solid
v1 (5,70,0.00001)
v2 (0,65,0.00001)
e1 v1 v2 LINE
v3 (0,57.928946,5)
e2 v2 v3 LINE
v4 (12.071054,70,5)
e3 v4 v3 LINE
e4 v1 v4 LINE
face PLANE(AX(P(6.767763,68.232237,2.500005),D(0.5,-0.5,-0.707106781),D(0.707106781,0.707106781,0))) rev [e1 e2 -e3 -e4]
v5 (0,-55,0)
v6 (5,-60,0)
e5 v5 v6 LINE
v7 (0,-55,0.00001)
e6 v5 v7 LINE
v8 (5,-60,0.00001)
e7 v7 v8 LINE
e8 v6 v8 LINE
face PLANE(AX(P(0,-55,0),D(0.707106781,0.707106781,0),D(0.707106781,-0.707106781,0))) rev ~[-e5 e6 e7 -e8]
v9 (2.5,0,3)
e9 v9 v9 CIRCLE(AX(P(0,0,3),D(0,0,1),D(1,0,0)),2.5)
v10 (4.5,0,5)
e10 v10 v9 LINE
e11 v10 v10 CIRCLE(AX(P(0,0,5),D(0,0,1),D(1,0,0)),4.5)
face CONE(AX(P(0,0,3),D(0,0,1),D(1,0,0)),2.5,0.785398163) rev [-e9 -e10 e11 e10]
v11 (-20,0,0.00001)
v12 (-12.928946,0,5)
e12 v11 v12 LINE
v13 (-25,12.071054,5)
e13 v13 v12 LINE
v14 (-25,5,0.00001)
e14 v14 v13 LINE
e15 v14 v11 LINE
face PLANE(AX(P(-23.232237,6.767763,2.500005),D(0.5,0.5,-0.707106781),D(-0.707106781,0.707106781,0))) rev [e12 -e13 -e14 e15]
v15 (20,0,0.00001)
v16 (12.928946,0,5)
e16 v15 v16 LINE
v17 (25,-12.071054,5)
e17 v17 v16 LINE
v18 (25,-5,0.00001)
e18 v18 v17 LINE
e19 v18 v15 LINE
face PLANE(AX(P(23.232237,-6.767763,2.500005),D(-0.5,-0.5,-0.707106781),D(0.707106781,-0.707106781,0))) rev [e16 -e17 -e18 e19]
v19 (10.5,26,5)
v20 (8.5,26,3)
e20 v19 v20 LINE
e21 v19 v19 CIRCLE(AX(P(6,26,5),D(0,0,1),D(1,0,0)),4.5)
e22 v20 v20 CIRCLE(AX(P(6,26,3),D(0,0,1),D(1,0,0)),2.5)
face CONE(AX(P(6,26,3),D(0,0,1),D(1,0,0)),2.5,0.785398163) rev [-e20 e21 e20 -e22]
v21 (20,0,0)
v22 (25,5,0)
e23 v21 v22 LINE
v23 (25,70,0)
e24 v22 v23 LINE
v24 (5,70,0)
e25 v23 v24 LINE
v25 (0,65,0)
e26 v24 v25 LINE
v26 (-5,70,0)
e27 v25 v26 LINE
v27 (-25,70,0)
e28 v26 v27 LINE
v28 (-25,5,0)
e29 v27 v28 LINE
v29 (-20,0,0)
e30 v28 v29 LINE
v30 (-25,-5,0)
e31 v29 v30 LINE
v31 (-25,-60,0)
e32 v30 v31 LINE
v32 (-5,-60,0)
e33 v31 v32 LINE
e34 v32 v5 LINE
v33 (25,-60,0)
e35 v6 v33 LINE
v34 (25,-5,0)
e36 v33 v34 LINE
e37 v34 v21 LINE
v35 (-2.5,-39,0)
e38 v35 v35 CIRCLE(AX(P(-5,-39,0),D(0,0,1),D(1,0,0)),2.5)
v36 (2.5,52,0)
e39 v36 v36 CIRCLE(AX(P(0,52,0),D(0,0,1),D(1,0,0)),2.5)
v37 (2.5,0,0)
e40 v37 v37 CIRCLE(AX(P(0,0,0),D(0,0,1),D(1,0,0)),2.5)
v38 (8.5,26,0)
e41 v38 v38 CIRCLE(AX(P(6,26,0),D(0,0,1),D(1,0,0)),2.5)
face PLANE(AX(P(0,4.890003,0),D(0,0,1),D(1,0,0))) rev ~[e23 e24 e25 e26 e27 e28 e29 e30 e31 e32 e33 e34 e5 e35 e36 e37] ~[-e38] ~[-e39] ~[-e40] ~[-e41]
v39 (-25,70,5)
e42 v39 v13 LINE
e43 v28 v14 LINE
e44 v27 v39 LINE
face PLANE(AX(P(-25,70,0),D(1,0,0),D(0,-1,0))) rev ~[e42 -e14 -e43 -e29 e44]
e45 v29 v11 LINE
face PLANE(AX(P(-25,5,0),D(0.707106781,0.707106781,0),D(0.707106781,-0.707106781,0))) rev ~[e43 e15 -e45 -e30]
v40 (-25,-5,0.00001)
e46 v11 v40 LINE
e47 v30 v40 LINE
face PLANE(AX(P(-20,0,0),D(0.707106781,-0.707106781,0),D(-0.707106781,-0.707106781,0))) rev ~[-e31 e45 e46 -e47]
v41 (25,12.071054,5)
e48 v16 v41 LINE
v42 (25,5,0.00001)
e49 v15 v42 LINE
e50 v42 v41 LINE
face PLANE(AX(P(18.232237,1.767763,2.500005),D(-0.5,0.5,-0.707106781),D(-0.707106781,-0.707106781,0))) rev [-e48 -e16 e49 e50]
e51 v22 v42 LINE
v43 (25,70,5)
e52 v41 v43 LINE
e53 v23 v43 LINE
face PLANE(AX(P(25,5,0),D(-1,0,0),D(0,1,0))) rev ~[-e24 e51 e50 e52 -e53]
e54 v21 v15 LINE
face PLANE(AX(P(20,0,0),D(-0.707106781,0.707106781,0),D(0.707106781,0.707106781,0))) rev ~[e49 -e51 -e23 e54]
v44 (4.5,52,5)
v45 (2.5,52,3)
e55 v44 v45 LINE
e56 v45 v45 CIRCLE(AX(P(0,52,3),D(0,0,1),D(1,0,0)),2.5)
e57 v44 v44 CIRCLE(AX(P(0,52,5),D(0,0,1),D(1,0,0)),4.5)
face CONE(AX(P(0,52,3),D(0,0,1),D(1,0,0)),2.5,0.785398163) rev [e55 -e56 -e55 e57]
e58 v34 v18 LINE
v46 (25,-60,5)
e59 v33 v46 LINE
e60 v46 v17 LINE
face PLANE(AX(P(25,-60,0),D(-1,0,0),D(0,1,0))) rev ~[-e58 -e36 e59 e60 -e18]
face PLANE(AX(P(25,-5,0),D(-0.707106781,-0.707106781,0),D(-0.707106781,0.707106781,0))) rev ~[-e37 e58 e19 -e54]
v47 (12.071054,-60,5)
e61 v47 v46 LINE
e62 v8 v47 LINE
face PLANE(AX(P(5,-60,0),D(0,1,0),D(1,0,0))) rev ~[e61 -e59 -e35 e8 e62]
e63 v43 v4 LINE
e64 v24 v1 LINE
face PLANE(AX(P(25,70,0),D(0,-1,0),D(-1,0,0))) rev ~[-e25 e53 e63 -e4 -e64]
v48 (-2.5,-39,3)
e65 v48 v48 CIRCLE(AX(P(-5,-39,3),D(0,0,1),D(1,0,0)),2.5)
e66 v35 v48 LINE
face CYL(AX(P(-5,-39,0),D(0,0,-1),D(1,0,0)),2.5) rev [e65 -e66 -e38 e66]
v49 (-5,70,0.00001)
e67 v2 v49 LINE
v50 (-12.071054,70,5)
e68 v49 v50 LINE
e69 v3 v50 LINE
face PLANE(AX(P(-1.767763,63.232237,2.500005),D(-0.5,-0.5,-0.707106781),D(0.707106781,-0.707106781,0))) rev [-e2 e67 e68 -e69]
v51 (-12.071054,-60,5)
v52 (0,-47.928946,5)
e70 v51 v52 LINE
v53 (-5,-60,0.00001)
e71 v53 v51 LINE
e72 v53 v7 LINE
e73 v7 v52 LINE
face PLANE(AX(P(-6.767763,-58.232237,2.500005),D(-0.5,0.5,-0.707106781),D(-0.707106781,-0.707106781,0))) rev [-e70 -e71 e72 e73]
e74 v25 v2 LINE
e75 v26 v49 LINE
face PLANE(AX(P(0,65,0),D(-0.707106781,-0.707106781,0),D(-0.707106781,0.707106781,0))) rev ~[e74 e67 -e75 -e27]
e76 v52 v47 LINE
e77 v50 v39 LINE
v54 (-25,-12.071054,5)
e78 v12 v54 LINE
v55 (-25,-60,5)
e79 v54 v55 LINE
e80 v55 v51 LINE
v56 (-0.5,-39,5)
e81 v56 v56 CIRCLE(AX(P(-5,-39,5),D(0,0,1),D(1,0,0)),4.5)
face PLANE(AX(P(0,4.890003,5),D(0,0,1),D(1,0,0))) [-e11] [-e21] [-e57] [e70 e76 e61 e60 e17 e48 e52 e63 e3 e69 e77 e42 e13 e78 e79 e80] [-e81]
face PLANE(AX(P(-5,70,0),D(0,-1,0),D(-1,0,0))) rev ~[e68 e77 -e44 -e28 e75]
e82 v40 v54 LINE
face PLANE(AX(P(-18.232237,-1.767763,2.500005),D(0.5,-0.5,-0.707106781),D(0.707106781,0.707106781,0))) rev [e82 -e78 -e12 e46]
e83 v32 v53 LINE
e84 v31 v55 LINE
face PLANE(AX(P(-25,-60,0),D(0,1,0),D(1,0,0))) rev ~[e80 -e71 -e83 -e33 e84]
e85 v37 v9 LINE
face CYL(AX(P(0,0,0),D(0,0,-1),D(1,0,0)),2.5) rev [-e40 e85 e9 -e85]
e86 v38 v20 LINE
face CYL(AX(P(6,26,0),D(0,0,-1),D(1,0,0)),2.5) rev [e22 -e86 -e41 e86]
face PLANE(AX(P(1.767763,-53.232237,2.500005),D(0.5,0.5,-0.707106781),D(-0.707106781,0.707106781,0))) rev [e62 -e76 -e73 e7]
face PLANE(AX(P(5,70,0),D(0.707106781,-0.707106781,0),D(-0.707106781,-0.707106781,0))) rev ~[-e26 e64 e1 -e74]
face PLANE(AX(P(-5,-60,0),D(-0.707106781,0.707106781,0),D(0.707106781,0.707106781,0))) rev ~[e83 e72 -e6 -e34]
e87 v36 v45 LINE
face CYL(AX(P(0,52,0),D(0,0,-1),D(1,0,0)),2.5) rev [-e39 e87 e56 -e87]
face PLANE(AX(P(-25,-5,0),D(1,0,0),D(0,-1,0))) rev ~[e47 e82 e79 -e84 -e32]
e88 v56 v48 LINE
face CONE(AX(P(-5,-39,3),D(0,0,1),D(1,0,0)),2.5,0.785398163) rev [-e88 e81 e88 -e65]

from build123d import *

# Parameters (mm, degrees)
F0_R     = 2.5
F1_DEPTH = 5
F2_SIZE  = 4.99999
F3_SIZE  = 2


# Not quite as in the source:
# - a fillet or chamfer is up to 0.001 mm smaller than in the source, because OpenCascade refuses the exact size


with BuildPart() as f1:
    # F0 (on Top) → F1 (new body)
    with BuildSketch(Plane.XY):
        Polygon((-5, 70), (-25, 70), (-25, 5), (-20, 0), (-25, -5), (-25, -60), (-5, -60), (0, -55), (5, -60), (25, -60), (25, -5), (20, 0), (25, 5), (25, 70), (5, 70), (0, 65), align=None)
        with Locations((-4.9999998882, -39)):
            Circle(F0_R, mode=Mode.SUBTRACT)
        Circle(F0_R, mode=Mode.SUBTRACT)
        with Locations((6, 26)):
            Circle(F0_R, mode=Mode.SUBTRACT)
        with Locations((0, 52)):
            Circle(F0_R, mode=Mode.SUBTRACT)
    extrude(amount=F1_DEPTH)

    # F2 (size 5 in the source; OpenCascade refuses exactly that, so slightly less here)
    f2_edges = [f1.edges().sort_by_distance(p)[0] for p in [
        (-2.5, 67.5, 5),
        (2.5, 67.5, 5),
        (22.5, 2.5, 5),
        (22.5, -2.5, 5),
        (-22.5, 2.5, 5),
        (-22.5, -2.5, 5),
        (-2.5, -57.5, 5),
        (2.5, -57.5, 5),
    ]]
    chamfer(f2_edges, length=F2_SIZE)

    # F3
    f3_edges = [f1.edges().sort_by_distance(p)[0] for p in [
        (-2.5, 52, 5),
        (3.5, 26, 5),
        (-7.5, -39, 5),
        (-2.5, 0, 5),
    ]]
    chamfer(f3_edges, length=F3_SIZE)


solid = f1.part
